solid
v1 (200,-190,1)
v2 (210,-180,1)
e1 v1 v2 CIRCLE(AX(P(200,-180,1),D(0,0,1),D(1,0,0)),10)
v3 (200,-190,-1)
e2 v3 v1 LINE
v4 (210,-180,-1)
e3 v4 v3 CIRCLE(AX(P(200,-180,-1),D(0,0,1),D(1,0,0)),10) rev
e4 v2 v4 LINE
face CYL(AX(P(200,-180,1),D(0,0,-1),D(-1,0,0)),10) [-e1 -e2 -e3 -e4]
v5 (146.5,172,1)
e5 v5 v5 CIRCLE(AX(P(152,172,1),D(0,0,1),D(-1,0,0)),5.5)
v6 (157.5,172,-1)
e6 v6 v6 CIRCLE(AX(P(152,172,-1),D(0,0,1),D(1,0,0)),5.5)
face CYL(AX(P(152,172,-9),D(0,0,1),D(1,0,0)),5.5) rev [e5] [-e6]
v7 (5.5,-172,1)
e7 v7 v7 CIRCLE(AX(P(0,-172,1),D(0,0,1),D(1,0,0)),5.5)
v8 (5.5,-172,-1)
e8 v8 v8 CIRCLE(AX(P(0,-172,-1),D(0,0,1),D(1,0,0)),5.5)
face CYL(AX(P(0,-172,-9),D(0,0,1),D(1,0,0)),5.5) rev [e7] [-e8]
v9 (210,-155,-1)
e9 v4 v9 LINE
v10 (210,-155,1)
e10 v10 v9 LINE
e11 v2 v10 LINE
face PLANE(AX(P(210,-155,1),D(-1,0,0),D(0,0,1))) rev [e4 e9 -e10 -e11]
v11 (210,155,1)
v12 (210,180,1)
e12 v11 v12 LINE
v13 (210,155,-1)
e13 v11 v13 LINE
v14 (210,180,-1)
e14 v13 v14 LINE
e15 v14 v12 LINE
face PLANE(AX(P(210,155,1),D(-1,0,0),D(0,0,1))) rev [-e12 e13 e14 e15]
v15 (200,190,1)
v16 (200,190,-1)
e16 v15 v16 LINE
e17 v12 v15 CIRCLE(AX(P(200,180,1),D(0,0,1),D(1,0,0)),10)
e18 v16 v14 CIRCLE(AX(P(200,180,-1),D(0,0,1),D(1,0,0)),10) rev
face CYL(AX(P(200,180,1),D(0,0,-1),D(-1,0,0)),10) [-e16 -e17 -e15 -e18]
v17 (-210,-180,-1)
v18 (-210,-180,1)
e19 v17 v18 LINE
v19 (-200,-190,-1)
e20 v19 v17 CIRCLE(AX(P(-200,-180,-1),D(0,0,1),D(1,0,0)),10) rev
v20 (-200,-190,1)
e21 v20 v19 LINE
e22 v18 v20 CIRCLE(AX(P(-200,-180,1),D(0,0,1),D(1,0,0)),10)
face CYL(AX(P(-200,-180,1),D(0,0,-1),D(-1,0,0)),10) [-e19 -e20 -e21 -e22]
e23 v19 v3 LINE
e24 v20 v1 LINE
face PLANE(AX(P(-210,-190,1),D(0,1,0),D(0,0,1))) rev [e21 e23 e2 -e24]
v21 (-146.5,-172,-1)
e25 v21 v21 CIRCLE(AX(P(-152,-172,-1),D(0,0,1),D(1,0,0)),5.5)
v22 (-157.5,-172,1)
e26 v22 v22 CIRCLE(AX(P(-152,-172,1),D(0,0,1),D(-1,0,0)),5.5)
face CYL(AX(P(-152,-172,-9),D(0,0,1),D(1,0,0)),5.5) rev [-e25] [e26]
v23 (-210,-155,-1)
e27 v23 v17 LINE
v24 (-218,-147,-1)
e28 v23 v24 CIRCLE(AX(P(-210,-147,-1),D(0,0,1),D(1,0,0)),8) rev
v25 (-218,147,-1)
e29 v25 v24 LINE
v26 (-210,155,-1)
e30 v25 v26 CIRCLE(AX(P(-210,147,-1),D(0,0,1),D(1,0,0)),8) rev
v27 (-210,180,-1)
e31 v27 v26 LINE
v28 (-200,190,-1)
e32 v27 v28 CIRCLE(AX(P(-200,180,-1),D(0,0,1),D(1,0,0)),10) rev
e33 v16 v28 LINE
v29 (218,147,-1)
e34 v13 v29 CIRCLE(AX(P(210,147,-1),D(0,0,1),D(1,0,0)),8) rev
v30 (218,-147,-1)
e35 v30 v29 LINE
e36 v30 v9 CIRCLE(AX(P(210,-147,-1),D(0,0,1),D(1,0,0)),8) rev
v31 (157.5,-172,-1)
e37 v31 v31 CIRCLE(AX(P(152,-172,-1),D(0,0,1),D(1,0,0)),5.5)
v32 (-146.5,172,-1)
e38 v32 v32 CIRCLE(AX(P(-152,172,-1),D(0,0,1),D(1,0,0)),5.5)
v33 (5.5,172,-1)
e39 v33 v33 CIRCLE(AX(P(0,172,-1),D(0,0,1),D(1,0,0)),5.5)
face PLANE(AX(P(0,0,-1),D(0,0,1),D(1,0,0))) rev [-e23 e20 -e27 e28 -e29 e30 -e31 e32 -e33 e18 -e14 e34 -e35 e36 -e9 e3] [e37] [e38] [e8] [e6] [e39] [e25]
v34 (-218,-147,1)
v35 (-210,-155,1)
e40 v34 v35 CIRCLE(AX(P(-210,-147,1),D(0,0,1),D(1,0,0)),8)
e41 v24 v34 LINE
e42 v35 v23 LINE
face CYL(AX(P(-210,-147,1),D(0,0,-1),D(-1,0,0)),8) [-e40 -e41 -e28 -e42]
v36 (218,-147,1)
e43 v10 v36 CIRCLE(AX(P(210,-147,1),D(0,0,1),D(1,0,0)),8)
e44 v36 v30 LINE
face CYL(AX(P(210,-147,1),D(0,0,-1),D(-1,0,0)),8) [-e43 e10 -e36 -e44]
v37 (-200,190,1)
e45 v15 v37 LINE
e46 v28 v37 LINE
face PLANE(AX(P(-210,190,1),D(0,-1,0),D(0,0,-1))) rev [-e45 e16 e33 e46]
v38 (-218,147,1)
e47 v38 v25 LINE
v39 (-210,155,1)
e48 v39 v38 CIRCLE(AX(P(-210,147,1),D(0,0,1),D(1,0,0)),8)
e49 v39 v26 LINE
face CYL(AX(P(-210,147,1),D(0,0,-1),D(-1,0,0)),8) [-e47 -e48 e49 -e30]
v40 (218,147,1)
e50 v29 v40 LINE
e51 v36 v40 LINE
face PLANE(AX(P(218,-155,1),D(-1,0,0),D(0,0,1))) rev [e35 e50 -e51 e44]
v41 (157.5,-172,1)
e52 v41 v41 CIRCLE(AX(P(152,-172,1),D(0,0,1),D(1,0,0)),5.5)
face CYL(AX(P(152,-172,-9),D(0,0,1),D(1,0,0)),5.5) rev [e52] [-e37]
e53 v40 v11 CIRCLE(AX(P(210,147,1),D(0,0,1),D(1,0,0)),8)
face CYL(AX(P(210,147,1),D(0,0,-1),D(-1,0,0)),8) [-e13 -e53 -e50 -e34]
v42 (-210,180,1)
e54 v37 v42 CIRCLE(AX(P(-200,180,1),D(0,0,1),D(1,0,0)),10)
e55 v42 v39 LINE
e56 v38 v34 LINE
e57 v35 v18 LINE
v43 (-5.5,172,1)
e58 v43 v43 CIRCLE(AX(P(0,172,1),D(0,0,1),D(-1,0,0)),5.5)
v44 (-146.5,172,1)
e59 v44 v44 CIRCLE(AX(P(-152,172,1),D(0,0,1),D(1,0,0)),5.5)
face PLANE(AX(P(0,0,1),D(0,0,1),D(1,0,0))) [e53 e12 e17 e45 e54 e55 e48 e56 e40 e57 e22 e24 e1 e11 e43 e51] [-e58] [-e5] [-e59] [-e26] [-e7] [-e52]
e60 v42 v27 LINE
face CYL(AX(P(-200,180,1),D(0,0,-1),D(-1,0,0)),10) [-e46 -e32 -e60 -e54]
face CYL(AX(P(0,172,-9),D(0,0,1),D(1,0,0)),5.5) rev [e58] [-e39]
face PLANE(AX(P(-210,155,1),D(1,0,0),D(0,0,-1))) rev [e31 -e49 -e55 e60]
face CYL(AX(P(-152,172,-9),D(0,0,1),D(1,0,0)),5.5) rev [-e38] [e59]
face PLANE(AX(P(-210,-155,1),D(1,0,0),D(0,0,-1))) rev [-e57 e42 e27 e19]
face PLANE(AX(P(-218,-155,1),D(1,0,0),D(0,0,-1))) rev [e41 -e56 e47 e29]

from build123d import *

# Parameters (mm, degrees)
EXTRUDE_1_DEPTH     = 1
FILLET_1_R          = 10
FILLET_2_R          = 8
SKETCH_2_R          = 5.5
CUT_EXTRUDE_1_DEPTH = 10


with BuildPart() as part:
    # Эскиз1 → Бобышка-Вытянуть1 (new, symmetric)
    with BuildSketch(Plane.XY):
        Polygon((-210, 155), (-210, 190), (210, 190), (210, 155), (218, 155), (218, -155), (210, -155), (210, -190), (-210, -190), (-210, -155), (-218, -155), (-218, 155), align=None)
    extrude(amount=EXTRUDE_1_DEPTH, both=True)

    # Скругление1
    fillet_1_edges = [part.edges().sort_by_distance(p)[0] for p in [
        (210, -190, 0),
        (-210, -190, 0),
        (-210, 190, 0),
        (210, 190, 0),
    ]]
    fillet(fillet_1_edges, radius=FILLET_1_R)

    # Скругление2
    fillet_2_edges = [part.edges().sort_by_distance(p)[0] for p in [
        (-218, -155, 0),
        (-218, 155, 0),
        (218, 155, 0),
        (218, -155, 0),
    ]]
    fillet(fillet_2_edges, radius=FILLET_2_R - 0.0001)  # a hair under: the kernel refuses the full size

    # Эскиз2 → Вырез-Вытянуть1 (cut)
    with BuildSketch(Plane.XY.offset(1)):
        with Locations((0, -172)):
            Circle(SKETCH_2_R)
        with Locations((152, -172)):
            Circle(SKETCH_2_R)
        with Locations((-152, -172)):
            Circle(SKETCH_2_R)
        with Locations((-152, 172)):
            Circle(SKETCH_2_R)
        with Locations((152, 172)):
            Circle(SKETCH_2_R)
        with Locations((0, 172)):
            Circle(SKETCH_2_R)
    extrude(amount=-CUT_EXTRUDE_1_DEPTH, mode=Mode.SUBTRACT)


solid = part.part
